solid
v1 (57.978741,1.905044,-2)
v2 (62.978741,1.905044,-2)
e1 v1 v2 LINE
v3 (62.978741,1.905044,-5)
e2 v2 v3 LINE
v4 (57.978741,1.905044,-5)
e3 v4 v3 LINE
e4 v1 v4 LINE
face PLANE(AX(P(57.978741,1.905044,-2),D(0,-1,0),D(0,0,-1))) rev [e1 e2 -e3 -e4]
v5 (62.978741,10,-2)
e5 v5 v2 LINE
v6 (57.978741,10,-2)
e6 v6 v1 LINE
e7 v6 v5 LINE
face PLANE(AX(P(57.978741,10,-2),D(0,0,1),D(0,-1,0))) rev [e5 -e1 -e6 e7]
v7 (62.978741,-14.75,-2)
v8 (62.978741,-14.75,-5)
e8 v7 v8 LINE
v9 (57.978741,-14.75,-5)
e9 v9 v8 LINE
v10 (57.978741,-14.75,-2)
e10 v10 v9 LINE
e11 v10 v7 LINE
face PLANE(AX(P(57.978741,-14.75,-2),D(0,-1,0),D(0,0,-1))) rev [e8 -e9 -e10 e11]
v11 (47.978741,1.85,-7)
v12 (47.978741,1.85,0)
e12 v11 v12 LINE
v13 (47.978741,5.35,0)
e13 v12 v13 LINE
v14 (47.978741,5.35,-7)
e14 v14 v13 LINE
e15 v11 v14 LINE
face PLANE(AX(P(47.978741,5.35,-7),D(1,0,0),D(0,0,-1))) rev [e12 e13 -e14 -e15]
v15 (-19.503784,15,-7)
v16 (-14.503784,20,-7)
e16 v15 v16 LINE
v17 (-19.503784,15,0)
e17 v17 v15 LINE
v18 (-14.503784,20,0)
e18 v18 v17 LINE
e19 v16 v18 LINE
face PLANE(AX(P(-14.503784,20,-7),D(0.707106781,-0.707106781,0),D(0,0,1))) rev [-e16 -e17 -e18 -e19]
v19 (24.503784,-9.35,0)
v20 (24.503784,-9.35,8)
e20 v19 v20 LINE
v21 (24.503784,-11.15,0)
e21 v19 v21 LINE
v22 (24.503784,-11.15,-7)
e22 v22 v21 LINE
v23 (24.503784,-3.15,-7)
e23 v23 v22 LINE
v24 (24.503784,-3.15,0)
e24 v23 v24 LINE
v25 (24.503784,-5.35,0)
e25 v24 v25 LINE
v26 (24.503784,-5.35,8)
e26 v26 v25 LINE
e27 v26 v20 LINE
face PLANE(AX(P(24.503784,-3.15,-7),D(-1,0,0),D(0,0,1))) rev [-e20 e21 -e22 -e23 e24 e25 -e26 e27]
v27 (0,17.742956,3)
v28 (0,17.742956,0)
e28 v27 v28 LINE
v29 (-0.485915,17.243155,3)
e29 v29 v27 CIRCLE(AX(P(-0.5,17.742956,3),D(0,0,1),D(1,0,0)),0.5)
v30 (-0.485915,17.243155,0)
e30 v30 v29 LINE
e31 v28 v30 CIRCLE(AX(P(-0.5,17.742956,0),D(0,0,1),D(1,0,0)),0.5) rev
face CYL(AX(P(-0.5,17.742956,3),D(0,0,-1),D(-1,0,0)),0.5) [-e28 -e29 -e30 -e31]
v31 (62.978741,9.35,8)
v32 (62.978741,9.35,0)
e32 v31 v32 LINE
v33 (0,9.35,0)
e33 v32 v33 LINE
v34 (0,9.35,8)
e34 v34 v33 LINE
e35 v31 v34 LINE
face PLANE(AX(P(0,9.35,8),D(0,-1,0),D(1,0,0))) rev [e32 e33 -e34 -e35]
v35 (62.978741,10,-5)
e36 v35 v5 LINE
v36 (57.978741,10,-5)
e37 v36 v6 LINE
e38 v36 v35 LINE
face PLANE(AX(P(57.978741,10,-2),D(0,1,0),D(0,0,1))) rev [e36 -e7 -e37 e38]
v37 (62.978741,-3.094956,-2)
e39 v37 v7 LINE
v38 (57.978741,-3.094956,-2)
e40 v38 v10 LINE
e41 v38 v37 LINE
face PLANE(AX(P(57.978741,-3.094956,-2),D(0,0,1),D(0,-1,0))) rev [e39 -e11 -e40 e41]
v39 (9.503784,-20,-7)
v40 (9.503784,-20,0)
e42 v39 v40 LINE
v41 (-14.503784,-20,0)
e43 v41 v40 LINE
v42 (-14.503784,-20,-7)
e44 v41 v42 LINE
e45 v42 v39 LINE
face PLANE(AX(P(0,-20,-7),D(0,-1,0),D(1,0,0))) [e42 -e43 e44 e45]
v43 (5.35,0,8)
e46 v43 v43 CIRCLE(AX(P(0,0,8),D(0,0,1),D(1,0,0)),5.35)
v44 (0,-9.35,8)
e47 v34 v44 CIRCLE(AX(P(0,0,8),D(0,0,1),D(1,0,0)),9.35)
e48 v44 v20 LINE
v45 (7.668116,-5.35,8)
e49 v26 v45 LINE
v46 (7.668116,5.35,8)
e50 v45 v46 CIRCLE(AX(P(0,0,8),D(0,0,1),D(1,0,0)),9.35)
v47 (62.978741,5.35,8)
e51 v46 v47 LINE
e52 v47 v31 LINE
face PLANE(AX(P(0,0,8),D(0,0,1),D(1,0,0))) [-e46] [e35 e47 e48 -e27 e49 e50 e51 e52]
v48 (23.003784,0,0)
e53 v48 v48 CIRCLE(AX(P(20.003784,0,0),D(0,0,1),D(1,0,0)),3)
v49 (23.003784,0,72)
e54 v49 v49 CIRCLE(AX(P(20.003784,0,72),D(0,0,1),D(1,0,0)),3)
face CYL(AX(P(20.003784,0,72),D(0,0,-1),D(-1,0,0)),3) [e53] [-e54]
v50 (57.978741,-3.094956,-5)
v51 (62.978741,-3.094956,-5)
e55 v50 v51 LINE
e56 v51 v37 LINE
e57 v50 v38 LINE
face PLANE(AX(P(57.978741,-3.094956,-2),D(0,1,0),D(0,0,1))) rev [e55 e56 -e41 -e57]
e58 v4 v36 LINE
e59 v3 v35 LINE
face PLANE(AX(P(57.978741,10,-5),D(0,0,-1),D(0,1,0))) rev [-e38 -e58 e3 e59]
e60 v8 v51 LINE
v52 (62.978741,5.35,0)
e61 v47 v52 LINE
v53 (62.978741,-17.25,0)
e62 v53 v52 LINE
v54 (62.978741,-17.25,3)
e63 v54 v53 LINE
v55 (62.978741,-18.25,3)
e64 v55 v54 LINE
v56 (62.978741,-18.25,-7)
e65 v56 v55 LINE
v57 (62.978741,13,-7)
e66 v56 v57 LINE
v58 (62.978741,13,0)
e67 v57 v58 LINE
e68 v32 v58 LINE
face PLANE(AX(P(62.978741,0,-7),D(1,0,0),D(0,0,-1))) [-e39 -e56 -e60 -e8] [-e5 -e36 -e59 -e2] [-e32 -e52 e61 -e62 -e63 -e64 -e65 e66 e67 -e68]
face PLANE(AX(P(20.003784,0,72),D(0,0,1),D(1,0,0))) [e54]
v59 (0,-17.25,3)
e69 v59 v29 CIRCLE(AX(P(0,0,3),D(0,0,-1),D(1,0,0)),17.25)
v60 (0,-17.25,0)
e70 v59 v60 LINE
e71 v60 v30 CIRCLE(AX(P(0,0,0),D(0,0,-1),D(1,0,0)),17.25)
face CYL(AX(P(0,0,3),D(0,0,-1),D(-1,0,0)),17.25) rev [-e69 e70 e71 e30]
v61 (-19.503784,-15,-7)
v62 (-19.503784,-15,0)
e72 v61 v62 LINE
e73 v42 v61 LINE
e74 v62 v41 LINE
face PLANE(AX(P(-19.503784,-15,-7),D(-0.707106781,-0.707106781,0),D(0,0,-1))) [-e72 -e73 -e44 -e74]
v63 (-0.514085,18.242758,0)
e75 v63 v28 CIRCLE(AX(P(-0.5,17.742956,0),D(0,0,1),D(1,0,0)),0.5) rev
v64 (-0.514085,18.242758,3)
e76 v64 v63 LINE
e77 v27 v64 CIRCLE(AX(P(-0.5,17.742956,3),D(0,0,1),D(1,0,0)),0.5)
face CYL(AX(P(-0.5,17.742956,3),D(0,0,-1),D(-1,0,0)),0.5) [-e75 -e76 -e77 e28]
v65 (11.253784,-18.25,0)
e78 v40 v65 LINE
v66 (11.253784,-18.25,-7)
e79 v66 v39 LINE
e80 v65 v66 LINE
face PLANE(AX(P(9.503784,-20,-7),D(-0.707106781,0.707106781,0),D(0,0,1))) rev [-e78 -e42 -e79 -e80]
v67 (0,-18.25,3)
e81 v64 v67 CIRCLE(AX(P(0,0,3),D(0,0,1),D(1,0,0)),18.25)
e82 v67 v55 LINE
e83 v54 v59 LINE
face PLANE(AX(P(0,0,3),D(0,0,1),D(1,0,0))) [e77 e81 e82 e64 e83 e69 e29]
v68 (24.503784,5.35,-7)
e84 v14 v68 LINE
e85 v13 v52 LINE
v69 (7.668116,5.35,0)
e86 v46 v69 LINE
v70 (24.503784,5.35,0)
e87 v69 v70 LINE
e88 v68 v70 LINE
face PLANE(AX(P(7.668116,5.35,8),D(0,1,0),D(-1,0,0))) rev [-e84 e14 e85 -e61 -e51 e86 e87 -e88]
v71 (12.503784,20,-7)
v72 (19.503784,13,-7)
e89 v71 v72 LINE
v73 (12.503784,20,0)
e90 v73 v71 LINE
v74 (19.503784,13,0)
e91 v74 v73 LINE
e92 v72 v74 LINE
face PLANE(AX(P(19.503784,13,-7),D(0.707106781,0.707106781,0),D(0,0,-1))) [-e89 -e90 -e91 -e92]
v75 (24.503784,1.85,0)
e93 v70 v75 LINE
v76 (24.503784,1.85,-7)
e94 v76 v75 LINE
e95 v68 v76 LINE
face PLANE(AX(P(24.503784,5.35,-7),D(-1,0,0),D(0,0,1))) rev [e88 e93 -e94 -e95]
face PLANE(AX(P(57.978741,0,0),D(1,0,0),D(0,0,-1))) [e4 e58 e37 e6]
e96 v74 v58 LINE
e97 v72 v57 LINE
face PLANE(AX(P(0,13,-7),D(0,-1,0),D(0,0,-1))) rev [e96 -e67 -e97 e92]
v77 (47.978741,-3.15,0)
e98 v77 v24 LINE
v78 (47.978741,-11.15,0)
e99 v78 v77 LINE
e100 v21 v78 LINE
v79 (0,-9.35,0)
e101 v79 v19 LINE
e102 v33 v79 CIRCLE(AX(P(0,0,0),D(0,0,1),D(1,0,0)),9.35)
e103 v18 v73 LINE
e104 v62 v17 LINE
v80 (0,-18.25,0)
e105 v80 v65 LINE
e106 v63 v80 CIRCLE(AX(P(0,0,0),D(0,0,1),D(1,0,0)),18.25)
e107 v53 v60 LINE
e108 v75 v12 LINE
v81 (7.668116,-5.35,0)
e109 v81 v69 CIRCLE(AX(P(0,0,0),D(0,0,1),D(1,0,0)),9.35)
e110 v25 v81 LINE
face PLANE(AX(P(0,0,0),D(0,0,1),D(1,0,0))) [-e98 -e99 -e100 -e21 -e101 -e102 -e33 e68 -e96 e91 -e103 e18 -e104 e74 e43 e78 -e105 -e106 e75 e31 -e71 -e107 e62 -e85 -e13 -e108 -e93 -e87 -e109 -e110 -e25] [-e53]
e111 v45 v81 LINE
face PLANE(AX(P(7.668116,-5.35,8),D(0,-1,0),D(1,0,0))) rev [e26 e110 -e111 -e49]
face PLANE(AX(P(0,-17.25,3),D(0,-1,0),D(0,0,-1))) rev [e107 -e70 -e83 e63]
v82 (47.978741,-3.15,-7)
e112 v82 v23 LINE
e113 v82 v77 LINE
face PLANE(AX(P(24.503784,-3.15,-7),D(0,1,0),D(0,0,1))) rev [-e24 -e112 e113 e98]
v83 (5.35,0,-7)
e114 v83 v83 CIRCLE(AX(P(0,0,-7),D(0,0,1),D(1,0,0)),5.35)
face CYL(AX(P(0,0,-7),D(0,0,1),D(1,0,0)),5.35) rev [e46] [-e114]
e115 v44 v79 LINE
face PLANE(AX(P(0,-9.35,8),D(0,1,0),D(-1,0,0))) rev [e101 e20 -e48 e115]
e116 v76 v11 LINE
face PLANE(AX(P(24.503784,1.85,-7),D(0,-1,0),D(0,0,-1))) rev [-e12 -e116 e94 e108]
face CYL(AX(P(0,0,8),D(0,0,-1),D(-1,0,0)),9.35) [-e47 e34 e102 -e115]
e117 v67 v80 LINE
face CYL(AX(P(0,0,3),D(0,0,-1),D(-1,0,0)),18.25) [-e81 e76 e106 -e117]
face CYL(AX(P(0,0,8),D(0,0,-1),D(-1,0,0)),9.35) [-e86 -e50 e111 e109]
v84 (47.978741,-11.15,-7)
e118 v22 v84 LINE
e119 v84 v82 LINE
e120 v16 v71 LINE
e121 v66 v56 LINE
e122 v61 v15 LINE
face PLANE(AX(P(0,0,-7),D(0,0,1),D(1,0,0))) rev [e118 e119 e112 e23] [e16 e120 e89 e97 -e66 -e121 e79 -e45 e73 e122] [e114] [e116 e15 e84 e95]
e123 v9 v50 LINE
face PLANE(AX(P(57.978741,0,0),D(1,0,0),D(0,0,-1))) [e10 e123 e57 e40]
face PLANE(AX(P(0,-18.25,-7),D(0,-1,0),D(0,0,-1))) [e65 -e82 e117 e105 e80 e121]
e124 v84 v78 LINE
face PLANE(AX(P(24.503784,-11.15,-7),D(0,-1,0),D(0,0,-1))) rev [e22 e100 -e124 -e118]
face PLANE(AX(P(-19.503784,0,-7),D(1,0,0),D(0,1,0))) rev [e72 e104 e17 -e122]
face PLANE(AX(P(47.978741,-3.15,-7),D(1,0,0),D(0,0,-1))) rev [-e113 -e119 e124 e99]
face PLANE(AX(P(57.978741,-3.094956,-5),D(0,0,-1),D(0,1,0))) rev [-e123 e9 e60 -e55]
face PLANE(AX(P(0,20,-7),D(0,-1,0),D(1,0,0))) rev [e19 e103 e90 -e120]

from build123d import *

# Parameters (mm, degrees)
SKETCH1_R               = 5.35
BOSS_EXTRUDE2_DEPTH     = 7
BOSS_EXTRUDE3_START     = 8
SKETCH3_R               = 5.35
BOSS_EXTRUDE3_DEPTH     = 8
BOSS_EXTRUDE4_DEPTH     = 3
CHAMFER1_SIZE           = 10
CHAMFER2_SIZE           = 5
CUT_EXTRUDE1_DEPTH      = 67.560662475
CUT_EXTRUDE1_DEPTH_BACK = 67.560662475
SKETCH5_W               = 23.474956737
SKETCH5_H               = 3.5
SKETCH5_H_2             = 8
CHAMFER3_SIZE           = 7
SKETCH6_W               = 3
SKETCH6_H               = 8.094956055
SKETCH6_H_2             = 11.655043945
CUT_EXTRUDE2_DEPTH      = 5
CUT_EXTRUDE3_REACH      = 87.249
SKETCH7_W               = 8
SKETCH7_H               = 4
SKETCH8_R               = 3
BOSS_EXTRUDE5_DEPTH     = 72
FILLET1_R               = 0.5


# Some blends are built 0.0001 mm under size
with BuildPart() as part:
    # Sketch1 → Boss-Extrude2 (new body)
    with BuildSketch(Plane.XY):
        Polygon((-19.503784034, -20), (19.503784034, -20), (19.503784034, -18.25), (62.978740771, -18.25), (62.978740771, 13), (19.503784034, 13), (19.503784034, 20), (-19.503784034, 20), align=None)
        Circle(SKETCH1_R, mode=Mode.SUBTRACT)
    extrude(amount=-BOSS_EXTRUDE2_DEPTH)

    # Sketch3 → Boss-Extrude3 (add)
    with BuildSketch(Plane.XY.offset(BOSS_EXTRUDE3_START)):
        with BuildLine():
            Line((7.668115805, 5.35), (62.978740771, 5.35))
            Line((62.978740771, 5.35), (62.978740771, 9.35))
            Line((62.978740771, 9.35), (0, 9.35))
            ThreePointArc((0, 9.35), (-9.35, 0), (0, -9.35))
            Line((0, -9.35), (62.978740771, -9.35))
            Line((62.978740771, -9.35), (62.978740771, -5.35))
            Line((62.978740771, -5.35), (7.668115805, -5.35))
            ThreePointArc((7.668115805, -5.35), (9.35, 0), (7.668115805, 5.35))
        make_face()
        Circle(SKETCH3_R, mode=Mode.SUBTRACT)
    extrude(amount=-BOSS_EXTRUDE3_DEPTH)

    # Sketch4 → Boss-Extrude4 (add)
    with BuildSketch(Plane.XY):
        with BuildLine():
            Line((0, -18.25), (62.978740771, -18.25))
            Line((62.978740771, -18.25), (62.978740771, -17.25))
            Line((62.978740771, -17.25), (8.306623863, -17.25))
            Line((8.306623863, -17.25), (0, -17.25))
            ThreePointArc((0, -17.25), (-17.25, 0), (0, 17.25))
            Line((0, 17.25), (0, 18.25))
            ThreePointArc((0, 18.25), (-18.25, 0), (0, -18.25))
        make_face()
    extrude(amount=BOSS_EXTRUDE4_DEPTH)

    # Chamfer1
    # the kernel refuses this chamfer: 10 mm, written as the material it takes off along each edge
    with BuildSketch(Plane(origin=(19.503784034, -20, 25.71682988), x_dir=(-0.9996219169112968, -0.027495876610586317, 0), z_dir=(0, 0, -1))) as chamfer1_piece_1_section:
        Polygon((CHAMFER1_SIZE * 0.999621916911, CHAMFER1_SIZE * 0.0274958766106), (-CHAMFER1_SIZE * 0.0274958766106, CHAMFER1_SIZE * 0.999621916911), (0, 0), align=None)
    chamfer1_piece_1 = extrude(amount=58.433659759, mode=Mode.PRIVATE)
    chamfer1_piece_1 = split(chamfer1_piece_1, bisect_by=Plane(origin=(14.814200223, -18.25, -3.5), z_dir=(0, -1, 0)), keep=Keep.TOP, mode=Mode.PRIVATE)
    add(chamfer1_piece_1, mode=Mode.SUBTRACT)

    # Chamfer2
    chamfer2_edges = [part.edges().sort_by_distance(p)[0] for p in [
        (-19.503784034, -20, -3.5),
        (-19.503784034, 20, -3.5),
    ]]
    chamfer(chamfer2_edges, length=CHAMFER2_SIZE)

    # Sketch5 → Cut-Extrude1 (cut, two sides: drawn at the far end of the back side and taken through both)
    with BuildSketch(Plane.XY.offset(-CUT_EXTRUDE1_DEPTH_BACK)):
        with Locations((36.241262403, 3.6)):
            Rectangle(SKETCH5_W, SKETCH5_H)
        with Locations((36.241262403, -7.15)):
            Rectangle(SKETCH5_W, SKETCH5_H_2)
    extrude(amount=CUT_EXTRUDE1_DEPTH + CUT_EXTRUDE1_DEPTH_BACK, mode=Mode.SUBTRACT)

    # Chamfer3
    chamfer3_edges = [part.edges().sort_by_distance(p)[0] for p in [
        (19.503784034, 20, -3.5),
    ]]
    chamfer(chamfer3_edges, length=CHAMFER3_SIZE - 0.0001)  # a hair under: the kernel refuses the full size

    # Sketch6 → Cut-Extrude2 (cut)
    with BuildSketch(Plane(origin=(62.978740771, 0, 0), x_dir=(0, 0, -1), z_dir=(1, 0, 0))):
        with Locations((3.5, 5.952521972)):
            Rectangle(SKETCH6_W, SKETCH6_H)
        with Locations((3.5, -8.922478028)):
            Rectangle(SKETCH6_W, SKETCH6_H_2)
    extrude(amount=-CUT_EXTRUDE2_DEPTH, mode=Mode.SUBTRACT)

    # Sketch7 → Cut-Extrude3 (cut, up to next)
    with BuildSketch(Plane(origin=(62.978740771, 0, 0), x_dir=(0, 0, -1), z_dir=(1, 0, 0)), mode=Mode.PRIVATE) as cut_extrude3_sk1:
        with Locations((-4, -7.35)):
            Rectangle(SKETCH7_W, SKETCH7_H)
    cut_extrude3_tool1 = extrude(cut_extrude3_sk1.sketch, amount=-CUT_EXTRUDE3_REACH, mode=Mode.PRIVATE) & part.part
    add(cut_extrude3_tool1.solids().sort_by_distance((62.978741, -7.35, 4))[0], mode=Mode.SUBTRACT)

    # Sketch8 → Boss-Extrude5 (add)
    with BuildSketch(Plane.XY):
        with Locations((20.003784034, 0)):
            Circle(SKETCH8_R)
    extrude(amount=BOSS_EXTRUDE5_DEPTH)

    # Fillet1
    fillet1_edges = [part.edges().sort_by_distance(p)[0] for p in [
        (0, 18.25, 1.5),
        (0, 17.25, 1.5),
    ]]
    fillet(fillet1_edges, radius=FILLET1_R - 0.0001)  # a hair under: the kernel refuses the full size


solid = part.part
